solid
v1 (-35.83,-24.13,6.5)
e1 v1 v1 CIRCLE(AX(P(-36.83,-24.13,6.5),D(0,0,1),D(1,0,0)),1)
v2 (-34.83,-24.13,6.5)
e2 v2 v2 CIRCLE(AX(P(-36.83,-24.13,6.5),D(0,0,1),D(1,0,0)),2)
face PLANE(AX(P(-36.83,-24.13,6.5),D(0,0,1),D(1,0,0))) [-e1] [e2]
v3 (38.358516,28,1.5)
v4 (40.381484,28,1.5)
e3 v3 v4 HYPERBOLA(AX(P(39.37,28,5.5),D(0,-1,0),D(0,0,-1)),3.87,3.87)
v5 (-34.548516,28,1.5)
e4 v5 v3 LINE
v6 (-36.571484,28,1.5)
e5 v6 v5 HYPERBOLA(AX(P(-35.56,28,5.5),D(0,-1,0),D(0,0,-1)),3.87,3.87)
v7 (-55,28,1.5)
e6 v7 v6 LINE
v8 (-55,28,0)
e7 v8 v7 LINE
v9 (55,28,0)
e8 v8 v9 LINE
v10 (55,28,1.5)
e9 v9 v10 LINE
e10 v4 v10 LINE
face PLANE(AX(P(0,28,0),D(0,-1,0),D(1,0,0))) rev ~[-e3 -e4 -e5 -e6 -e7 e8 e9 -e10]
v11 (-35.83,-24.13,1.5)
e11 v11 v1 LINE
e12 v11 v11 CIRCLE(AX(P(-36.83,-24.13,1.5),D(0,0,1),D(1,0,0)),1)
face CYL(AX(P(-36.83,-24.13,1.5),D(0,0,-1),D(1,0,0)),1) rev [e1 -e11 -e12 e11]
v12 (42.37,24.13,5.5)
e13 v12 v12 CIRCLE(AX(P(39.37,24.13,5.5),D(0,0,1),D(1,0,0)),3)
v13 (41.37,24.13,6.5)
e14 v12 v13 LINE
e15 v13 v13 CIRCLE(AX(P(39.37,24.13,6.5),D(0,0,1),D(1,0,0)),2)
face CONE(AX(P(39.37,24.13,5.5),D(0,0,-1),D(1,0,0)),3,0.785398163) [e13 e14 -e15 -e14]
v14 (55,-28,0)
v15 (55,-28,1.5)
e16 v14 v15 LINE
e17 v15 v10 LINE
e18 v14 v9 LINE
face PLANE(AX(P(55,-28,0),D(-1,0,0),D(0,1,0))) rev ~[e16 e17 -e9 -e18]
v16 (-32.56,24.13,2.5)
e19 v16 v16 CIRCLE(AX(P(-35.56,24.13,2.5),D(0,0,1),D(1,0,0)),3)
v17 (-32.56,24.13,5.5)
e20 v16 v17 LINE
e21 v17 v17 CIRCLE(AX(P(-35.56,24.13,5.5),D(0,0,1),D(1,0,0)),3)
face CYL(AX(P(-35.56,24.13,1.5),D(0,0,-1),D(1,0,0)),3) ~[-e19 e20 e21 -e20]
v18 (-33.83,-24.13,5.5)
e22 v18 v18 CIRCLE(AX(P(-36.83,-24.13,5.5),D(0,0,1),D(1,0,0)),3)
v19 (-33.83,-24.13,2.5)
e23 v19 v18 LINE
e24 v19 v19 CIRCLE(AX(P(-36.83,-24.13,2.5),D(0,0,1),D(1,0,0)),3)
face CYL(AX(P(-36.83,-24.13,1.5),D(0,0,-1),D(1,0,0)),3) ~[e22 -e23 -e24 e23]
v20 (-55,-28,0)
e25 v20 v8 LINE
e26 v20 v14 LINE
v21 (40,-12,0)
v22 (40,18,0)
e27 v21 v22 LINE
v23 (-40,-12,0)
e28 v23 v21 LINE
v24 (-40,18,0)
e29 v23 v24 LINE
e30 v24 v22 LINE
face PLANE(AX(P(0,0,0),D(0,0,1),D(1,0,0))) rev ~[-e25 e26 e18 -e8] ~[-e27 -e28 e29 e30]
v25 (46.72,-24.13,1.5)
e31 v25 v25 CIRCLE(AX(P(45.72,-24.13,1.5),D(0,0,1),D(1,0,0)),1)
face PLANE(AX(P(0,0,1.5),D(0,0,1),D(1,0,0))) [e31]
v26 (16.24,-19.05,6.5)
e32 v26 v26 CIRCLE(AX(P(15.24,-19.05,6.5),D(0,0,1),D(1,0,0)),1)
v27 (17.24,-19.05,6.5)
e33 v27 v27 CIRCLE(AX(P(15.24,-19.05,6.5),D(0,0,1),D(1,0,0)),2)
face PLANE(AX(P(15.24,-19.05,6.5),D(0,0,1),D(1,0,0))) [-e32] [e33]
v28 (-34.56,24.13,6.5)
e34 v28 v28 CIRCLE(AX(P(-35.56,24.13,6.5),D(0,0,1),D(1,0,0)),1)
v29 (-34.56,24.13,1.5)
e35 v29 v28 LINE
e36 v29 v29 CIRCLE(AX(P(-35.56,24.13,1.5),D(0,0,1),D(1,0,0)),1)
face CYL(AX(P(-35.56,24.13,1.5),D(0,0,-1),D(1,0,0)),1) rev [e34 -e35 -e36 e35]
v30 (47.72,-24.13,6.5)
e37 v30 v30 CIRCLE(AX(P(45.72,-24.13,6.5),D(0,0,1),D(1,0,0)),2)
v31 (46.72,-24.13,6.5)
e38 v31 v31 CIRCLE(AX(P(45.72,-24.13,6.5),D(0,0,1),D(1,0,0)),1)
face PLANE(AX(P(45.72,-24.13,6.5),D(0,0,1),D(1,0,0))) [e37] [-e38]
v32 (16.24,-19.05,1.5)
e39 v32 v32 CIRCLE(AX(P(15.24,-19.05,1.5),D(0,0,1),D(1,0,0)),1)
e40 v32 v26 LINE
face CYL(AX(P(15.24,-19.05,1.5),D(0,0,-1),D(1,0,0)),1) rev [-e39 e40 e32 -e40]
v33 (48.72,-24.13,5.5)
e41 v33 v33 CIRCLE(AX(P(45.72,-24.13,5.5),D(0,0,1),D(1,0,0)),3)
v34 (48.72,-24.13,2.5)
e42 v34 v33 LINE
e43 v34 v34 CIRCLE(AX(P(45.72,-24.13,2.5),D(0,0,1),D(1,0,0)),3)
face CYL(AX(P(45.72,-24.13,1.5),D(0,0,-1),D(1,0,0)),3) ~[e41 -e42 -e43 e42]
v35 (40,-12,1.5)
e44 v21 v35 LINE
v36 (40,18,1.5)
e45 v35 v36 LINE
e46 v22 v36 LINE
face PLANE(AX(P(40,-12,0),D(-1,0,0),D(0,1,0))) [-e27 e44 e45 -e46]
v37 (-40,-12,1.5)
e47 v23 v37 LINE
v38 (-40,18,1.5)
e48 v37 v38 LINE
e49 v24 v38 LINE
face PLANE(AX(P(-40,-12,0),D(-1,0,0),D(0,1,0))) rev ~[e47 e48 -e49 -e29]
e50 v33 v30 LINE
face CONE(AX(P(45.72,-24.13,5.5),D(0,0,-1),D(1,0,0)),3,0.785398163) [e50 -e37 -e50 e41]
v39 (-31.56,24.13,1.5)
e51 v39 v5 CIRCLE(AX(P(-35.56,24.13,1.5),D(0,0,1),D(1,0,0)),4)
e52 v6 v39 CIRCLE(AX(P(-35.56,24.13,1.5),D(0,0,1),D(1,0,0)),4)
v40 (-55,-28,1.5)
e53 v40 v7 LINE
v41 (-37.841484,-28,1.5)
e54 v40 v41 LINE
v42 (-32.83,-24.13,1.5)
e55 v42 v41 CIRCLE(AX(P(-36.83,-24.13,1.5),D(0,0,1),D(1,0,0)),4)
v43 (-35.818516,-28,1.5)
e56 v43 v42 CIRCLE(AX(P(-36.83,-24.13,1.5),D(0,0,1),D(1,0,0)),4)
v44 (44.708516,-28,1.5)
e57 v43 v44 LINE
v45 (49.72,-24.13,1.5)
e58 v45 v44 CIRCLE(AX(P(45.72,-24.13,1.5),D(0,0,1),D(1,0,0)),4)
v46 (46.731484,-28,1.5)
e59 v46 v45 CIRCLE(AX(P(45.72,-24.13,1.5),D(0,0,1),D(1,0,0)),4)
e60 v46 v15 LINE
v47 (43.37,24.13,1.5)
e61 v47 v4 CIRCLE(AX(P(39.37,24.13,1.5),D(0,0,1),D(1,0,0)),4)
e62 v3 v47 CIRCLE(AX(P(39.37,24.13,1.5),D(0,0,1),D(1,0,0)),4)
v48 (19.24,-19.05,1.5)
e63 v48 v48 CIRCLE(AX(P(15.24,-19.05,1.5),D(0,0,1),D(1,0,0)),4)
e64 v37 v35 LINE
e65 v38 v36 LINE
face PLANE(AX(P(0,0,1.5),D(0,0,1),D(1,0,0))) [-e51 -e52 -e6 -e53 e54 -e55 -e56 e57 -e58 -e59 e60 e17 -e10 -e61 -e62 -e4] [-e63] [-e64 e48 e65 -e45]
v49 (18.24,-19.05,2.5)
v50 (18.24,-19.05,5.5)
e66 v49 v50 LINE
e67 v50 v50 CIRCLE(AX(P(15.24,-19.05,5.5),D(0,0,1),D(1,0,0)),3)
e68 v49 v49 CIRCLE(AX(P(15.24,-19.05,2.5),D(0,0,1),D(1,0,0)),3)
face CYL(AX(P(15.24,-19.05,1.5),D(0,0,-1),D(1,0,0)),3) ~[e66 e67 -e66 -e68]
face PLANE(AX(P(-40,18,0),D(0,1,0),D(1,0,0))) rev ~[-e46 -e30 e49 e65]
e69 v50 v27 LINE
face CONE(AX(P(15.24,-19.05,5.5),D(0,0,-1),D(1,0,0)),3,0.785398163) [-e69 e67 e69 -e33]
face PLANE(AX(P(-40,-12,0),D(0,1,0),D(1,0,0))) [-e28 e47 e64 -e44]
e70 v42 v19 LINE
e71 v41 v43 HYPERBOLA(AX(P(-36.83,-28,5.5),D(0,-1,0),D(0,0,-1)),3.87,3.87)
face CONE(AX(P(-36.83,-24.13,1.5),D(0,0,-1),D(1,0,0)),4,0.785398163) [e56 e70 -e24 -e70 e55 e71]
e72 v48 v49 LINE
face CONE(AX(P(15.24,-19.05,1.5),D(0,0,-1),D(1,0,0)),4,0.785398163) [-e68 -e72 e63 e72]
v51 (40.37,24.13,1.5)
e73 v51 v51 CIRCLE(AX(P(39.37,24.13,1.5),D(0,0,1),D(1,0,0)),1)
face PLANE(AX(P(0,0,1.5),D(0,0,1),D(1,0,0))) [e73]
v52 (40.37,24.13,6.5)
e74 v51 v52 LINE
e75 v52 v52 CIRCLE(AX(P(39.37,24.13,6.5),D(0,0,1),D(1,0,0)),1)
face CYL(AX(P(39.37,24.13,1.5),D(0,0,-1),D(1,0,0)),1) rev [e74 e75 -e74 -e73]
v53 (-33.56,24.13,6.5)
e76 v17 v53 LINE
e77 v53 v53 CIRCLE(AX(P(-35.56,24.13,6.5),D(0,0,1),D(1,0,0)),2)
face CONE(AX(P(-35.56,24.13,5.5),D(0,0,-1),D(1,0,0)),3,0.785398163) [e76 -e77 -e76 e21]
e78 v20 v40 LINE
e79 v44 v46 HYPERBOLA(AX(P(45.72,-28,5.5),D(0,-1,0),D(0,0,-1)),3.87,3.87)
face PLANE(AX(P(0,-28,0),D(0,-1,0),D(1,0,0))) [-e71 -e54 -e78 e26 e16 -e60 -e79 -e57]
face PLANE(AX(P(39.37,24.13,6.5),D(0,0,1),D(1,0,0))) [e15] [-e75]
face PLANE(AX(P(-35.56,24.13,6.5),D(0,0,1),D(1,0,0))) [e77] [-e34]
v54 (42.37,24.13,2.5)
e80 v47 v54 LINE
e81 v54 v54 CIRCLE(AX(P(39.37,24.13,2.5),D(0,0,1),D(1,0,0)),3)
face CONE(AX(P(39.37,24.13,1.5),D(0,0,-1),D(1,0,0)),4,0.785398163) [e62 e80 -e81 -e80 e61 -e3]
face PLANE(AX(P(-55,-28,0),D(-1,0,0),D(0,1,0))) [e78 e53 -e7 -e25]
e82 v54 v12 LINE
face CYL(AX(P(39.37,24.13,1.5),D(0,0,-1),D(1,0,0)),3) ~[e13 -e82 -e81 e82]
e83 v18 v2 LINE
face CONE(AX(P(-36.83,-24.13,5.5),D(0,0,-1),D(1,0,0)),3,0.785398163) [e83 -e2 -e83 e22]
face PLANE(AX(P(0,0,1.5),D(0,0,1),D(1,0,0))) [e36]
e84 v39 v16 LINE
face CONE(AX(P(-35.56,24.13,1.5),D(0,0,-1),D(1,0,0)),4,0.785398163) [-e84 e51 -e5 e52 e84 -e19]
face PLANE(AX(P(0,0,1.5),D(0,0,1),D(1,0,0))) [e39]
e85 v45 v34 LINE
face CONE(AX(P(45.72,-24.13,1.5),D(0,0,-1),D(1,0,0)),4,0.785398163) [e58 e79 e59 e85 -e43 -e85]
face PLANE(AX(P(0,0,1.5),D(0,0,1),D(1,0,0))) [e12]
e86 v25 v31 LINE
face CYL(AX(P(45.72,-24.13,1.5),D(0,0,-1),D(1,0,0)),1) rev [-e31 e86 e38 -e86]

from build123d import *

# Parameters (mm, degrees)
F0_W     = 110
F0_H     = 56
F0_W_2   = 80
F0_H_2   = 30
F1_DEPTH = 1.5
F2_R     = 3
F2_R_2   = 1
F3_DEPTH = 5


# Not quite as in the source:
# - a fillet or chamfer that OpenCascade refuses, or shapes differently, is made with other operations: its cross-section is extruded or revolved along the edge and cut away or added


with BuildPart() as f1:
    # F0 (on Top) → F1 (new body)
    with BuildSketch(Plane.XY):
        Rectangle(F0_W, F0_H)
        with Locations((0, 3)):
            Rectangle(F0_W_2, F0_H_2, mode=Mode.SUBTRACT)
    extrude(amount=F1_DEPTH)

    # F2 (on face) → F3 (join)
    with BuildSketch(Plane.XY.offset(1.5)):
        with Locations((-35.56, 24.13)):
            Circle(F2_R)
        with Locations((-35.56, 24.13)):
            Circle(F2_R_2, mode=Mode.SUBTRACT)
        with Locations((39.37, 24.13)):
            Circle(F2_R)
        with Locations((39.37, 24.13)):
            Circle(F2_R_2, mode=Mode.SUBTRACT)
        with Locations((-36.83, -24.13)):
            Circle(F2_R)
        with Locations((-36.83, -24.13)):
            Circle(F2_R_2, mode=Mode.SUBTRACT)
        with Locations((15.24, -19.05)):
            Circle(F2_R)
        with Locations((15.24, -19.05)):
            Circle(F2_R_2, mode=Mode.SUBTRACT)
        with Locations((45.72, -24.13)):
            Circle(F2_R)
        with Locations((45.72, -24.13)):
            Circle(F2_R_2, mode=Mode.SUBTRACT)
    extrude(amount=F3_DEPTH)

    # F4: chamfer of 1 on 10 edges, made by hand


with BuildPart() as f4_tool2:
    # F4_s3 → F4_t4 (revolve)
    with BuildSketch(Plane.XZ.offset(-24.13)):
        Polygon((-31.56, 1.5), (-32.56, 2.5), (-32.56, 1.5), align=None)
    revolve(axis=Axis((-35.56, 24.13, 1.5), (0, 0, 1)))

    split(bisect_by=Plane.XZ.offset(-28), keep=Keep.TOP)


with BuildPart() as f1_1:
    add(f1.part)

    # F4_t1: union F4_tool2
    add(f4_tool2.part)


with BuildPart() as f4_tool7:
    # F4_s8 → F4_t9 (revolve)
    with BuildSketch(Plane.XZ.offset(-24.13)):
        Polygon((43.37, 1.5), (42.37, 2.5), (42.37, 1.5), align=None)
    revolve(axis=Axis((39.37, 24.13, 1.5), (0, 0, 1)))

    split(bisect_by=Plane.XZ.offset(-28), keep=Keep.TOP)


with BuildPart() as f1_2:
    add(f1_1.part)

    # F4_t6: union F4_tool7
    add(f4_tool7.part)


with BuildPart() as f4_tool12:
    # F4_s13 → F4_t14 (revolve)
    with BuildSketch(Plane.XZ.offset(24.13)):
        Polygon((49.72, 1.5), (48.72, 2.5), (48.72, 1.5), align=None)
    revolve(axis=Axis((45.72, -24.13, 1.5), (0, 0, 1)))

    split(bisect_by=Plane.XZ.offset(28), keep=Keep.BOTTOM)


with BuildPart() as f1_3:
    add(f1_2.part)

    # F4_t11: union F4_tool12
    add(f4_tool12.part)

    # F4_s16 → F4_t17 (revolve)
    with BuildSketch(Plane.XZ.offset(19.05)):
        Polygon((19.24, 1.5), (18.24, 2.5), (18.24, 1.5), align=None)
    revolve(axis=Axis((15.24, -19.05, 1.5), (0, 0, 1)))


with BuildPart() as f4_tool19:
    # F4_s20 → F4_t21 (revolve)
    with BuildSketch(Plane.XZ.offset(24.13)):
        Polygon((-32.83, 1.5), (-33.83, 2.5), (-33.83, 1.5), align=None)
    revolve(axis=Axis((-36.83, -24.13, 1.5), (0, 0, 1)))

    split(bisect_by=Plane.XZ.offset(28), keep=Keep.BOTTOM)


with BuildPart() as f1_4:
    add(f1_3.part)

    # F4_t18: union F4_tool19
    add(f4_tool19.part)

    # F4_s23 → F4_t24 (revolve, cut)
    with BuildSketch(Plane.XZ.offset(24.13)):
        Polygon((-33.83, 5.5), (-34.83, 6.5), (-33.83, 6.5), align=None)
    revolve(axis=Axis((-36.83, -24.13, 6.5), (0, 0, 1)), mode=Mode.SUBTRACT)

    # F4_s25 → F4_t26 (revolve, cut)
    with BuildSketch(Plane.XZ.offset(-24.13)):
        Polygon((-32.56, 5.5), (-33.56, 6.5), (-32.56, 6.5), align=None)
    revolve(axis=Axis((-35.56, 24.13, 6.5), (0, 0, 1)), mode=Mode.SUBTRACT)

    # F4_s27 → F4_t28 (revolve, cut)
    with BuildSketch(Plane.XZ.offset(-24.13)):
        Polygon((42.37, 5.5), (41.37, 6.5), (42.37, 6.5), align=None)
    revolve(axis=Axis((39.37, 24.13, 6.5), (0, 0, 1)), mode=Mode.SUBTRACT)

    # F4_s29 → F4_t30 (revolve, cut)
    with BuildSketch(Plane.XZ.offset(24.13)):
        Polygon((48.72, 5.5), (47.72, 6.5), (48.72, 6.5), align=None)
    revolve(axis=Axis((45.72, -24.13, 6.5), (0, 0, 1)), mode=Mode.SUBTRACT)

    # F4_s31 → F4_t32 (revolve, cut)
    with BuildSketch(Plane.XZ.offset(19.05)):
        Polygon((18.24, 5.5), (17.24, 6.5), (18.24, 6.5), align=None)
    revolve(axis=Axis((15.24, -19.05, 6.5), (0, 0, 1)), mode=Mode.SUBTRACT)


solid = f1_4.part
